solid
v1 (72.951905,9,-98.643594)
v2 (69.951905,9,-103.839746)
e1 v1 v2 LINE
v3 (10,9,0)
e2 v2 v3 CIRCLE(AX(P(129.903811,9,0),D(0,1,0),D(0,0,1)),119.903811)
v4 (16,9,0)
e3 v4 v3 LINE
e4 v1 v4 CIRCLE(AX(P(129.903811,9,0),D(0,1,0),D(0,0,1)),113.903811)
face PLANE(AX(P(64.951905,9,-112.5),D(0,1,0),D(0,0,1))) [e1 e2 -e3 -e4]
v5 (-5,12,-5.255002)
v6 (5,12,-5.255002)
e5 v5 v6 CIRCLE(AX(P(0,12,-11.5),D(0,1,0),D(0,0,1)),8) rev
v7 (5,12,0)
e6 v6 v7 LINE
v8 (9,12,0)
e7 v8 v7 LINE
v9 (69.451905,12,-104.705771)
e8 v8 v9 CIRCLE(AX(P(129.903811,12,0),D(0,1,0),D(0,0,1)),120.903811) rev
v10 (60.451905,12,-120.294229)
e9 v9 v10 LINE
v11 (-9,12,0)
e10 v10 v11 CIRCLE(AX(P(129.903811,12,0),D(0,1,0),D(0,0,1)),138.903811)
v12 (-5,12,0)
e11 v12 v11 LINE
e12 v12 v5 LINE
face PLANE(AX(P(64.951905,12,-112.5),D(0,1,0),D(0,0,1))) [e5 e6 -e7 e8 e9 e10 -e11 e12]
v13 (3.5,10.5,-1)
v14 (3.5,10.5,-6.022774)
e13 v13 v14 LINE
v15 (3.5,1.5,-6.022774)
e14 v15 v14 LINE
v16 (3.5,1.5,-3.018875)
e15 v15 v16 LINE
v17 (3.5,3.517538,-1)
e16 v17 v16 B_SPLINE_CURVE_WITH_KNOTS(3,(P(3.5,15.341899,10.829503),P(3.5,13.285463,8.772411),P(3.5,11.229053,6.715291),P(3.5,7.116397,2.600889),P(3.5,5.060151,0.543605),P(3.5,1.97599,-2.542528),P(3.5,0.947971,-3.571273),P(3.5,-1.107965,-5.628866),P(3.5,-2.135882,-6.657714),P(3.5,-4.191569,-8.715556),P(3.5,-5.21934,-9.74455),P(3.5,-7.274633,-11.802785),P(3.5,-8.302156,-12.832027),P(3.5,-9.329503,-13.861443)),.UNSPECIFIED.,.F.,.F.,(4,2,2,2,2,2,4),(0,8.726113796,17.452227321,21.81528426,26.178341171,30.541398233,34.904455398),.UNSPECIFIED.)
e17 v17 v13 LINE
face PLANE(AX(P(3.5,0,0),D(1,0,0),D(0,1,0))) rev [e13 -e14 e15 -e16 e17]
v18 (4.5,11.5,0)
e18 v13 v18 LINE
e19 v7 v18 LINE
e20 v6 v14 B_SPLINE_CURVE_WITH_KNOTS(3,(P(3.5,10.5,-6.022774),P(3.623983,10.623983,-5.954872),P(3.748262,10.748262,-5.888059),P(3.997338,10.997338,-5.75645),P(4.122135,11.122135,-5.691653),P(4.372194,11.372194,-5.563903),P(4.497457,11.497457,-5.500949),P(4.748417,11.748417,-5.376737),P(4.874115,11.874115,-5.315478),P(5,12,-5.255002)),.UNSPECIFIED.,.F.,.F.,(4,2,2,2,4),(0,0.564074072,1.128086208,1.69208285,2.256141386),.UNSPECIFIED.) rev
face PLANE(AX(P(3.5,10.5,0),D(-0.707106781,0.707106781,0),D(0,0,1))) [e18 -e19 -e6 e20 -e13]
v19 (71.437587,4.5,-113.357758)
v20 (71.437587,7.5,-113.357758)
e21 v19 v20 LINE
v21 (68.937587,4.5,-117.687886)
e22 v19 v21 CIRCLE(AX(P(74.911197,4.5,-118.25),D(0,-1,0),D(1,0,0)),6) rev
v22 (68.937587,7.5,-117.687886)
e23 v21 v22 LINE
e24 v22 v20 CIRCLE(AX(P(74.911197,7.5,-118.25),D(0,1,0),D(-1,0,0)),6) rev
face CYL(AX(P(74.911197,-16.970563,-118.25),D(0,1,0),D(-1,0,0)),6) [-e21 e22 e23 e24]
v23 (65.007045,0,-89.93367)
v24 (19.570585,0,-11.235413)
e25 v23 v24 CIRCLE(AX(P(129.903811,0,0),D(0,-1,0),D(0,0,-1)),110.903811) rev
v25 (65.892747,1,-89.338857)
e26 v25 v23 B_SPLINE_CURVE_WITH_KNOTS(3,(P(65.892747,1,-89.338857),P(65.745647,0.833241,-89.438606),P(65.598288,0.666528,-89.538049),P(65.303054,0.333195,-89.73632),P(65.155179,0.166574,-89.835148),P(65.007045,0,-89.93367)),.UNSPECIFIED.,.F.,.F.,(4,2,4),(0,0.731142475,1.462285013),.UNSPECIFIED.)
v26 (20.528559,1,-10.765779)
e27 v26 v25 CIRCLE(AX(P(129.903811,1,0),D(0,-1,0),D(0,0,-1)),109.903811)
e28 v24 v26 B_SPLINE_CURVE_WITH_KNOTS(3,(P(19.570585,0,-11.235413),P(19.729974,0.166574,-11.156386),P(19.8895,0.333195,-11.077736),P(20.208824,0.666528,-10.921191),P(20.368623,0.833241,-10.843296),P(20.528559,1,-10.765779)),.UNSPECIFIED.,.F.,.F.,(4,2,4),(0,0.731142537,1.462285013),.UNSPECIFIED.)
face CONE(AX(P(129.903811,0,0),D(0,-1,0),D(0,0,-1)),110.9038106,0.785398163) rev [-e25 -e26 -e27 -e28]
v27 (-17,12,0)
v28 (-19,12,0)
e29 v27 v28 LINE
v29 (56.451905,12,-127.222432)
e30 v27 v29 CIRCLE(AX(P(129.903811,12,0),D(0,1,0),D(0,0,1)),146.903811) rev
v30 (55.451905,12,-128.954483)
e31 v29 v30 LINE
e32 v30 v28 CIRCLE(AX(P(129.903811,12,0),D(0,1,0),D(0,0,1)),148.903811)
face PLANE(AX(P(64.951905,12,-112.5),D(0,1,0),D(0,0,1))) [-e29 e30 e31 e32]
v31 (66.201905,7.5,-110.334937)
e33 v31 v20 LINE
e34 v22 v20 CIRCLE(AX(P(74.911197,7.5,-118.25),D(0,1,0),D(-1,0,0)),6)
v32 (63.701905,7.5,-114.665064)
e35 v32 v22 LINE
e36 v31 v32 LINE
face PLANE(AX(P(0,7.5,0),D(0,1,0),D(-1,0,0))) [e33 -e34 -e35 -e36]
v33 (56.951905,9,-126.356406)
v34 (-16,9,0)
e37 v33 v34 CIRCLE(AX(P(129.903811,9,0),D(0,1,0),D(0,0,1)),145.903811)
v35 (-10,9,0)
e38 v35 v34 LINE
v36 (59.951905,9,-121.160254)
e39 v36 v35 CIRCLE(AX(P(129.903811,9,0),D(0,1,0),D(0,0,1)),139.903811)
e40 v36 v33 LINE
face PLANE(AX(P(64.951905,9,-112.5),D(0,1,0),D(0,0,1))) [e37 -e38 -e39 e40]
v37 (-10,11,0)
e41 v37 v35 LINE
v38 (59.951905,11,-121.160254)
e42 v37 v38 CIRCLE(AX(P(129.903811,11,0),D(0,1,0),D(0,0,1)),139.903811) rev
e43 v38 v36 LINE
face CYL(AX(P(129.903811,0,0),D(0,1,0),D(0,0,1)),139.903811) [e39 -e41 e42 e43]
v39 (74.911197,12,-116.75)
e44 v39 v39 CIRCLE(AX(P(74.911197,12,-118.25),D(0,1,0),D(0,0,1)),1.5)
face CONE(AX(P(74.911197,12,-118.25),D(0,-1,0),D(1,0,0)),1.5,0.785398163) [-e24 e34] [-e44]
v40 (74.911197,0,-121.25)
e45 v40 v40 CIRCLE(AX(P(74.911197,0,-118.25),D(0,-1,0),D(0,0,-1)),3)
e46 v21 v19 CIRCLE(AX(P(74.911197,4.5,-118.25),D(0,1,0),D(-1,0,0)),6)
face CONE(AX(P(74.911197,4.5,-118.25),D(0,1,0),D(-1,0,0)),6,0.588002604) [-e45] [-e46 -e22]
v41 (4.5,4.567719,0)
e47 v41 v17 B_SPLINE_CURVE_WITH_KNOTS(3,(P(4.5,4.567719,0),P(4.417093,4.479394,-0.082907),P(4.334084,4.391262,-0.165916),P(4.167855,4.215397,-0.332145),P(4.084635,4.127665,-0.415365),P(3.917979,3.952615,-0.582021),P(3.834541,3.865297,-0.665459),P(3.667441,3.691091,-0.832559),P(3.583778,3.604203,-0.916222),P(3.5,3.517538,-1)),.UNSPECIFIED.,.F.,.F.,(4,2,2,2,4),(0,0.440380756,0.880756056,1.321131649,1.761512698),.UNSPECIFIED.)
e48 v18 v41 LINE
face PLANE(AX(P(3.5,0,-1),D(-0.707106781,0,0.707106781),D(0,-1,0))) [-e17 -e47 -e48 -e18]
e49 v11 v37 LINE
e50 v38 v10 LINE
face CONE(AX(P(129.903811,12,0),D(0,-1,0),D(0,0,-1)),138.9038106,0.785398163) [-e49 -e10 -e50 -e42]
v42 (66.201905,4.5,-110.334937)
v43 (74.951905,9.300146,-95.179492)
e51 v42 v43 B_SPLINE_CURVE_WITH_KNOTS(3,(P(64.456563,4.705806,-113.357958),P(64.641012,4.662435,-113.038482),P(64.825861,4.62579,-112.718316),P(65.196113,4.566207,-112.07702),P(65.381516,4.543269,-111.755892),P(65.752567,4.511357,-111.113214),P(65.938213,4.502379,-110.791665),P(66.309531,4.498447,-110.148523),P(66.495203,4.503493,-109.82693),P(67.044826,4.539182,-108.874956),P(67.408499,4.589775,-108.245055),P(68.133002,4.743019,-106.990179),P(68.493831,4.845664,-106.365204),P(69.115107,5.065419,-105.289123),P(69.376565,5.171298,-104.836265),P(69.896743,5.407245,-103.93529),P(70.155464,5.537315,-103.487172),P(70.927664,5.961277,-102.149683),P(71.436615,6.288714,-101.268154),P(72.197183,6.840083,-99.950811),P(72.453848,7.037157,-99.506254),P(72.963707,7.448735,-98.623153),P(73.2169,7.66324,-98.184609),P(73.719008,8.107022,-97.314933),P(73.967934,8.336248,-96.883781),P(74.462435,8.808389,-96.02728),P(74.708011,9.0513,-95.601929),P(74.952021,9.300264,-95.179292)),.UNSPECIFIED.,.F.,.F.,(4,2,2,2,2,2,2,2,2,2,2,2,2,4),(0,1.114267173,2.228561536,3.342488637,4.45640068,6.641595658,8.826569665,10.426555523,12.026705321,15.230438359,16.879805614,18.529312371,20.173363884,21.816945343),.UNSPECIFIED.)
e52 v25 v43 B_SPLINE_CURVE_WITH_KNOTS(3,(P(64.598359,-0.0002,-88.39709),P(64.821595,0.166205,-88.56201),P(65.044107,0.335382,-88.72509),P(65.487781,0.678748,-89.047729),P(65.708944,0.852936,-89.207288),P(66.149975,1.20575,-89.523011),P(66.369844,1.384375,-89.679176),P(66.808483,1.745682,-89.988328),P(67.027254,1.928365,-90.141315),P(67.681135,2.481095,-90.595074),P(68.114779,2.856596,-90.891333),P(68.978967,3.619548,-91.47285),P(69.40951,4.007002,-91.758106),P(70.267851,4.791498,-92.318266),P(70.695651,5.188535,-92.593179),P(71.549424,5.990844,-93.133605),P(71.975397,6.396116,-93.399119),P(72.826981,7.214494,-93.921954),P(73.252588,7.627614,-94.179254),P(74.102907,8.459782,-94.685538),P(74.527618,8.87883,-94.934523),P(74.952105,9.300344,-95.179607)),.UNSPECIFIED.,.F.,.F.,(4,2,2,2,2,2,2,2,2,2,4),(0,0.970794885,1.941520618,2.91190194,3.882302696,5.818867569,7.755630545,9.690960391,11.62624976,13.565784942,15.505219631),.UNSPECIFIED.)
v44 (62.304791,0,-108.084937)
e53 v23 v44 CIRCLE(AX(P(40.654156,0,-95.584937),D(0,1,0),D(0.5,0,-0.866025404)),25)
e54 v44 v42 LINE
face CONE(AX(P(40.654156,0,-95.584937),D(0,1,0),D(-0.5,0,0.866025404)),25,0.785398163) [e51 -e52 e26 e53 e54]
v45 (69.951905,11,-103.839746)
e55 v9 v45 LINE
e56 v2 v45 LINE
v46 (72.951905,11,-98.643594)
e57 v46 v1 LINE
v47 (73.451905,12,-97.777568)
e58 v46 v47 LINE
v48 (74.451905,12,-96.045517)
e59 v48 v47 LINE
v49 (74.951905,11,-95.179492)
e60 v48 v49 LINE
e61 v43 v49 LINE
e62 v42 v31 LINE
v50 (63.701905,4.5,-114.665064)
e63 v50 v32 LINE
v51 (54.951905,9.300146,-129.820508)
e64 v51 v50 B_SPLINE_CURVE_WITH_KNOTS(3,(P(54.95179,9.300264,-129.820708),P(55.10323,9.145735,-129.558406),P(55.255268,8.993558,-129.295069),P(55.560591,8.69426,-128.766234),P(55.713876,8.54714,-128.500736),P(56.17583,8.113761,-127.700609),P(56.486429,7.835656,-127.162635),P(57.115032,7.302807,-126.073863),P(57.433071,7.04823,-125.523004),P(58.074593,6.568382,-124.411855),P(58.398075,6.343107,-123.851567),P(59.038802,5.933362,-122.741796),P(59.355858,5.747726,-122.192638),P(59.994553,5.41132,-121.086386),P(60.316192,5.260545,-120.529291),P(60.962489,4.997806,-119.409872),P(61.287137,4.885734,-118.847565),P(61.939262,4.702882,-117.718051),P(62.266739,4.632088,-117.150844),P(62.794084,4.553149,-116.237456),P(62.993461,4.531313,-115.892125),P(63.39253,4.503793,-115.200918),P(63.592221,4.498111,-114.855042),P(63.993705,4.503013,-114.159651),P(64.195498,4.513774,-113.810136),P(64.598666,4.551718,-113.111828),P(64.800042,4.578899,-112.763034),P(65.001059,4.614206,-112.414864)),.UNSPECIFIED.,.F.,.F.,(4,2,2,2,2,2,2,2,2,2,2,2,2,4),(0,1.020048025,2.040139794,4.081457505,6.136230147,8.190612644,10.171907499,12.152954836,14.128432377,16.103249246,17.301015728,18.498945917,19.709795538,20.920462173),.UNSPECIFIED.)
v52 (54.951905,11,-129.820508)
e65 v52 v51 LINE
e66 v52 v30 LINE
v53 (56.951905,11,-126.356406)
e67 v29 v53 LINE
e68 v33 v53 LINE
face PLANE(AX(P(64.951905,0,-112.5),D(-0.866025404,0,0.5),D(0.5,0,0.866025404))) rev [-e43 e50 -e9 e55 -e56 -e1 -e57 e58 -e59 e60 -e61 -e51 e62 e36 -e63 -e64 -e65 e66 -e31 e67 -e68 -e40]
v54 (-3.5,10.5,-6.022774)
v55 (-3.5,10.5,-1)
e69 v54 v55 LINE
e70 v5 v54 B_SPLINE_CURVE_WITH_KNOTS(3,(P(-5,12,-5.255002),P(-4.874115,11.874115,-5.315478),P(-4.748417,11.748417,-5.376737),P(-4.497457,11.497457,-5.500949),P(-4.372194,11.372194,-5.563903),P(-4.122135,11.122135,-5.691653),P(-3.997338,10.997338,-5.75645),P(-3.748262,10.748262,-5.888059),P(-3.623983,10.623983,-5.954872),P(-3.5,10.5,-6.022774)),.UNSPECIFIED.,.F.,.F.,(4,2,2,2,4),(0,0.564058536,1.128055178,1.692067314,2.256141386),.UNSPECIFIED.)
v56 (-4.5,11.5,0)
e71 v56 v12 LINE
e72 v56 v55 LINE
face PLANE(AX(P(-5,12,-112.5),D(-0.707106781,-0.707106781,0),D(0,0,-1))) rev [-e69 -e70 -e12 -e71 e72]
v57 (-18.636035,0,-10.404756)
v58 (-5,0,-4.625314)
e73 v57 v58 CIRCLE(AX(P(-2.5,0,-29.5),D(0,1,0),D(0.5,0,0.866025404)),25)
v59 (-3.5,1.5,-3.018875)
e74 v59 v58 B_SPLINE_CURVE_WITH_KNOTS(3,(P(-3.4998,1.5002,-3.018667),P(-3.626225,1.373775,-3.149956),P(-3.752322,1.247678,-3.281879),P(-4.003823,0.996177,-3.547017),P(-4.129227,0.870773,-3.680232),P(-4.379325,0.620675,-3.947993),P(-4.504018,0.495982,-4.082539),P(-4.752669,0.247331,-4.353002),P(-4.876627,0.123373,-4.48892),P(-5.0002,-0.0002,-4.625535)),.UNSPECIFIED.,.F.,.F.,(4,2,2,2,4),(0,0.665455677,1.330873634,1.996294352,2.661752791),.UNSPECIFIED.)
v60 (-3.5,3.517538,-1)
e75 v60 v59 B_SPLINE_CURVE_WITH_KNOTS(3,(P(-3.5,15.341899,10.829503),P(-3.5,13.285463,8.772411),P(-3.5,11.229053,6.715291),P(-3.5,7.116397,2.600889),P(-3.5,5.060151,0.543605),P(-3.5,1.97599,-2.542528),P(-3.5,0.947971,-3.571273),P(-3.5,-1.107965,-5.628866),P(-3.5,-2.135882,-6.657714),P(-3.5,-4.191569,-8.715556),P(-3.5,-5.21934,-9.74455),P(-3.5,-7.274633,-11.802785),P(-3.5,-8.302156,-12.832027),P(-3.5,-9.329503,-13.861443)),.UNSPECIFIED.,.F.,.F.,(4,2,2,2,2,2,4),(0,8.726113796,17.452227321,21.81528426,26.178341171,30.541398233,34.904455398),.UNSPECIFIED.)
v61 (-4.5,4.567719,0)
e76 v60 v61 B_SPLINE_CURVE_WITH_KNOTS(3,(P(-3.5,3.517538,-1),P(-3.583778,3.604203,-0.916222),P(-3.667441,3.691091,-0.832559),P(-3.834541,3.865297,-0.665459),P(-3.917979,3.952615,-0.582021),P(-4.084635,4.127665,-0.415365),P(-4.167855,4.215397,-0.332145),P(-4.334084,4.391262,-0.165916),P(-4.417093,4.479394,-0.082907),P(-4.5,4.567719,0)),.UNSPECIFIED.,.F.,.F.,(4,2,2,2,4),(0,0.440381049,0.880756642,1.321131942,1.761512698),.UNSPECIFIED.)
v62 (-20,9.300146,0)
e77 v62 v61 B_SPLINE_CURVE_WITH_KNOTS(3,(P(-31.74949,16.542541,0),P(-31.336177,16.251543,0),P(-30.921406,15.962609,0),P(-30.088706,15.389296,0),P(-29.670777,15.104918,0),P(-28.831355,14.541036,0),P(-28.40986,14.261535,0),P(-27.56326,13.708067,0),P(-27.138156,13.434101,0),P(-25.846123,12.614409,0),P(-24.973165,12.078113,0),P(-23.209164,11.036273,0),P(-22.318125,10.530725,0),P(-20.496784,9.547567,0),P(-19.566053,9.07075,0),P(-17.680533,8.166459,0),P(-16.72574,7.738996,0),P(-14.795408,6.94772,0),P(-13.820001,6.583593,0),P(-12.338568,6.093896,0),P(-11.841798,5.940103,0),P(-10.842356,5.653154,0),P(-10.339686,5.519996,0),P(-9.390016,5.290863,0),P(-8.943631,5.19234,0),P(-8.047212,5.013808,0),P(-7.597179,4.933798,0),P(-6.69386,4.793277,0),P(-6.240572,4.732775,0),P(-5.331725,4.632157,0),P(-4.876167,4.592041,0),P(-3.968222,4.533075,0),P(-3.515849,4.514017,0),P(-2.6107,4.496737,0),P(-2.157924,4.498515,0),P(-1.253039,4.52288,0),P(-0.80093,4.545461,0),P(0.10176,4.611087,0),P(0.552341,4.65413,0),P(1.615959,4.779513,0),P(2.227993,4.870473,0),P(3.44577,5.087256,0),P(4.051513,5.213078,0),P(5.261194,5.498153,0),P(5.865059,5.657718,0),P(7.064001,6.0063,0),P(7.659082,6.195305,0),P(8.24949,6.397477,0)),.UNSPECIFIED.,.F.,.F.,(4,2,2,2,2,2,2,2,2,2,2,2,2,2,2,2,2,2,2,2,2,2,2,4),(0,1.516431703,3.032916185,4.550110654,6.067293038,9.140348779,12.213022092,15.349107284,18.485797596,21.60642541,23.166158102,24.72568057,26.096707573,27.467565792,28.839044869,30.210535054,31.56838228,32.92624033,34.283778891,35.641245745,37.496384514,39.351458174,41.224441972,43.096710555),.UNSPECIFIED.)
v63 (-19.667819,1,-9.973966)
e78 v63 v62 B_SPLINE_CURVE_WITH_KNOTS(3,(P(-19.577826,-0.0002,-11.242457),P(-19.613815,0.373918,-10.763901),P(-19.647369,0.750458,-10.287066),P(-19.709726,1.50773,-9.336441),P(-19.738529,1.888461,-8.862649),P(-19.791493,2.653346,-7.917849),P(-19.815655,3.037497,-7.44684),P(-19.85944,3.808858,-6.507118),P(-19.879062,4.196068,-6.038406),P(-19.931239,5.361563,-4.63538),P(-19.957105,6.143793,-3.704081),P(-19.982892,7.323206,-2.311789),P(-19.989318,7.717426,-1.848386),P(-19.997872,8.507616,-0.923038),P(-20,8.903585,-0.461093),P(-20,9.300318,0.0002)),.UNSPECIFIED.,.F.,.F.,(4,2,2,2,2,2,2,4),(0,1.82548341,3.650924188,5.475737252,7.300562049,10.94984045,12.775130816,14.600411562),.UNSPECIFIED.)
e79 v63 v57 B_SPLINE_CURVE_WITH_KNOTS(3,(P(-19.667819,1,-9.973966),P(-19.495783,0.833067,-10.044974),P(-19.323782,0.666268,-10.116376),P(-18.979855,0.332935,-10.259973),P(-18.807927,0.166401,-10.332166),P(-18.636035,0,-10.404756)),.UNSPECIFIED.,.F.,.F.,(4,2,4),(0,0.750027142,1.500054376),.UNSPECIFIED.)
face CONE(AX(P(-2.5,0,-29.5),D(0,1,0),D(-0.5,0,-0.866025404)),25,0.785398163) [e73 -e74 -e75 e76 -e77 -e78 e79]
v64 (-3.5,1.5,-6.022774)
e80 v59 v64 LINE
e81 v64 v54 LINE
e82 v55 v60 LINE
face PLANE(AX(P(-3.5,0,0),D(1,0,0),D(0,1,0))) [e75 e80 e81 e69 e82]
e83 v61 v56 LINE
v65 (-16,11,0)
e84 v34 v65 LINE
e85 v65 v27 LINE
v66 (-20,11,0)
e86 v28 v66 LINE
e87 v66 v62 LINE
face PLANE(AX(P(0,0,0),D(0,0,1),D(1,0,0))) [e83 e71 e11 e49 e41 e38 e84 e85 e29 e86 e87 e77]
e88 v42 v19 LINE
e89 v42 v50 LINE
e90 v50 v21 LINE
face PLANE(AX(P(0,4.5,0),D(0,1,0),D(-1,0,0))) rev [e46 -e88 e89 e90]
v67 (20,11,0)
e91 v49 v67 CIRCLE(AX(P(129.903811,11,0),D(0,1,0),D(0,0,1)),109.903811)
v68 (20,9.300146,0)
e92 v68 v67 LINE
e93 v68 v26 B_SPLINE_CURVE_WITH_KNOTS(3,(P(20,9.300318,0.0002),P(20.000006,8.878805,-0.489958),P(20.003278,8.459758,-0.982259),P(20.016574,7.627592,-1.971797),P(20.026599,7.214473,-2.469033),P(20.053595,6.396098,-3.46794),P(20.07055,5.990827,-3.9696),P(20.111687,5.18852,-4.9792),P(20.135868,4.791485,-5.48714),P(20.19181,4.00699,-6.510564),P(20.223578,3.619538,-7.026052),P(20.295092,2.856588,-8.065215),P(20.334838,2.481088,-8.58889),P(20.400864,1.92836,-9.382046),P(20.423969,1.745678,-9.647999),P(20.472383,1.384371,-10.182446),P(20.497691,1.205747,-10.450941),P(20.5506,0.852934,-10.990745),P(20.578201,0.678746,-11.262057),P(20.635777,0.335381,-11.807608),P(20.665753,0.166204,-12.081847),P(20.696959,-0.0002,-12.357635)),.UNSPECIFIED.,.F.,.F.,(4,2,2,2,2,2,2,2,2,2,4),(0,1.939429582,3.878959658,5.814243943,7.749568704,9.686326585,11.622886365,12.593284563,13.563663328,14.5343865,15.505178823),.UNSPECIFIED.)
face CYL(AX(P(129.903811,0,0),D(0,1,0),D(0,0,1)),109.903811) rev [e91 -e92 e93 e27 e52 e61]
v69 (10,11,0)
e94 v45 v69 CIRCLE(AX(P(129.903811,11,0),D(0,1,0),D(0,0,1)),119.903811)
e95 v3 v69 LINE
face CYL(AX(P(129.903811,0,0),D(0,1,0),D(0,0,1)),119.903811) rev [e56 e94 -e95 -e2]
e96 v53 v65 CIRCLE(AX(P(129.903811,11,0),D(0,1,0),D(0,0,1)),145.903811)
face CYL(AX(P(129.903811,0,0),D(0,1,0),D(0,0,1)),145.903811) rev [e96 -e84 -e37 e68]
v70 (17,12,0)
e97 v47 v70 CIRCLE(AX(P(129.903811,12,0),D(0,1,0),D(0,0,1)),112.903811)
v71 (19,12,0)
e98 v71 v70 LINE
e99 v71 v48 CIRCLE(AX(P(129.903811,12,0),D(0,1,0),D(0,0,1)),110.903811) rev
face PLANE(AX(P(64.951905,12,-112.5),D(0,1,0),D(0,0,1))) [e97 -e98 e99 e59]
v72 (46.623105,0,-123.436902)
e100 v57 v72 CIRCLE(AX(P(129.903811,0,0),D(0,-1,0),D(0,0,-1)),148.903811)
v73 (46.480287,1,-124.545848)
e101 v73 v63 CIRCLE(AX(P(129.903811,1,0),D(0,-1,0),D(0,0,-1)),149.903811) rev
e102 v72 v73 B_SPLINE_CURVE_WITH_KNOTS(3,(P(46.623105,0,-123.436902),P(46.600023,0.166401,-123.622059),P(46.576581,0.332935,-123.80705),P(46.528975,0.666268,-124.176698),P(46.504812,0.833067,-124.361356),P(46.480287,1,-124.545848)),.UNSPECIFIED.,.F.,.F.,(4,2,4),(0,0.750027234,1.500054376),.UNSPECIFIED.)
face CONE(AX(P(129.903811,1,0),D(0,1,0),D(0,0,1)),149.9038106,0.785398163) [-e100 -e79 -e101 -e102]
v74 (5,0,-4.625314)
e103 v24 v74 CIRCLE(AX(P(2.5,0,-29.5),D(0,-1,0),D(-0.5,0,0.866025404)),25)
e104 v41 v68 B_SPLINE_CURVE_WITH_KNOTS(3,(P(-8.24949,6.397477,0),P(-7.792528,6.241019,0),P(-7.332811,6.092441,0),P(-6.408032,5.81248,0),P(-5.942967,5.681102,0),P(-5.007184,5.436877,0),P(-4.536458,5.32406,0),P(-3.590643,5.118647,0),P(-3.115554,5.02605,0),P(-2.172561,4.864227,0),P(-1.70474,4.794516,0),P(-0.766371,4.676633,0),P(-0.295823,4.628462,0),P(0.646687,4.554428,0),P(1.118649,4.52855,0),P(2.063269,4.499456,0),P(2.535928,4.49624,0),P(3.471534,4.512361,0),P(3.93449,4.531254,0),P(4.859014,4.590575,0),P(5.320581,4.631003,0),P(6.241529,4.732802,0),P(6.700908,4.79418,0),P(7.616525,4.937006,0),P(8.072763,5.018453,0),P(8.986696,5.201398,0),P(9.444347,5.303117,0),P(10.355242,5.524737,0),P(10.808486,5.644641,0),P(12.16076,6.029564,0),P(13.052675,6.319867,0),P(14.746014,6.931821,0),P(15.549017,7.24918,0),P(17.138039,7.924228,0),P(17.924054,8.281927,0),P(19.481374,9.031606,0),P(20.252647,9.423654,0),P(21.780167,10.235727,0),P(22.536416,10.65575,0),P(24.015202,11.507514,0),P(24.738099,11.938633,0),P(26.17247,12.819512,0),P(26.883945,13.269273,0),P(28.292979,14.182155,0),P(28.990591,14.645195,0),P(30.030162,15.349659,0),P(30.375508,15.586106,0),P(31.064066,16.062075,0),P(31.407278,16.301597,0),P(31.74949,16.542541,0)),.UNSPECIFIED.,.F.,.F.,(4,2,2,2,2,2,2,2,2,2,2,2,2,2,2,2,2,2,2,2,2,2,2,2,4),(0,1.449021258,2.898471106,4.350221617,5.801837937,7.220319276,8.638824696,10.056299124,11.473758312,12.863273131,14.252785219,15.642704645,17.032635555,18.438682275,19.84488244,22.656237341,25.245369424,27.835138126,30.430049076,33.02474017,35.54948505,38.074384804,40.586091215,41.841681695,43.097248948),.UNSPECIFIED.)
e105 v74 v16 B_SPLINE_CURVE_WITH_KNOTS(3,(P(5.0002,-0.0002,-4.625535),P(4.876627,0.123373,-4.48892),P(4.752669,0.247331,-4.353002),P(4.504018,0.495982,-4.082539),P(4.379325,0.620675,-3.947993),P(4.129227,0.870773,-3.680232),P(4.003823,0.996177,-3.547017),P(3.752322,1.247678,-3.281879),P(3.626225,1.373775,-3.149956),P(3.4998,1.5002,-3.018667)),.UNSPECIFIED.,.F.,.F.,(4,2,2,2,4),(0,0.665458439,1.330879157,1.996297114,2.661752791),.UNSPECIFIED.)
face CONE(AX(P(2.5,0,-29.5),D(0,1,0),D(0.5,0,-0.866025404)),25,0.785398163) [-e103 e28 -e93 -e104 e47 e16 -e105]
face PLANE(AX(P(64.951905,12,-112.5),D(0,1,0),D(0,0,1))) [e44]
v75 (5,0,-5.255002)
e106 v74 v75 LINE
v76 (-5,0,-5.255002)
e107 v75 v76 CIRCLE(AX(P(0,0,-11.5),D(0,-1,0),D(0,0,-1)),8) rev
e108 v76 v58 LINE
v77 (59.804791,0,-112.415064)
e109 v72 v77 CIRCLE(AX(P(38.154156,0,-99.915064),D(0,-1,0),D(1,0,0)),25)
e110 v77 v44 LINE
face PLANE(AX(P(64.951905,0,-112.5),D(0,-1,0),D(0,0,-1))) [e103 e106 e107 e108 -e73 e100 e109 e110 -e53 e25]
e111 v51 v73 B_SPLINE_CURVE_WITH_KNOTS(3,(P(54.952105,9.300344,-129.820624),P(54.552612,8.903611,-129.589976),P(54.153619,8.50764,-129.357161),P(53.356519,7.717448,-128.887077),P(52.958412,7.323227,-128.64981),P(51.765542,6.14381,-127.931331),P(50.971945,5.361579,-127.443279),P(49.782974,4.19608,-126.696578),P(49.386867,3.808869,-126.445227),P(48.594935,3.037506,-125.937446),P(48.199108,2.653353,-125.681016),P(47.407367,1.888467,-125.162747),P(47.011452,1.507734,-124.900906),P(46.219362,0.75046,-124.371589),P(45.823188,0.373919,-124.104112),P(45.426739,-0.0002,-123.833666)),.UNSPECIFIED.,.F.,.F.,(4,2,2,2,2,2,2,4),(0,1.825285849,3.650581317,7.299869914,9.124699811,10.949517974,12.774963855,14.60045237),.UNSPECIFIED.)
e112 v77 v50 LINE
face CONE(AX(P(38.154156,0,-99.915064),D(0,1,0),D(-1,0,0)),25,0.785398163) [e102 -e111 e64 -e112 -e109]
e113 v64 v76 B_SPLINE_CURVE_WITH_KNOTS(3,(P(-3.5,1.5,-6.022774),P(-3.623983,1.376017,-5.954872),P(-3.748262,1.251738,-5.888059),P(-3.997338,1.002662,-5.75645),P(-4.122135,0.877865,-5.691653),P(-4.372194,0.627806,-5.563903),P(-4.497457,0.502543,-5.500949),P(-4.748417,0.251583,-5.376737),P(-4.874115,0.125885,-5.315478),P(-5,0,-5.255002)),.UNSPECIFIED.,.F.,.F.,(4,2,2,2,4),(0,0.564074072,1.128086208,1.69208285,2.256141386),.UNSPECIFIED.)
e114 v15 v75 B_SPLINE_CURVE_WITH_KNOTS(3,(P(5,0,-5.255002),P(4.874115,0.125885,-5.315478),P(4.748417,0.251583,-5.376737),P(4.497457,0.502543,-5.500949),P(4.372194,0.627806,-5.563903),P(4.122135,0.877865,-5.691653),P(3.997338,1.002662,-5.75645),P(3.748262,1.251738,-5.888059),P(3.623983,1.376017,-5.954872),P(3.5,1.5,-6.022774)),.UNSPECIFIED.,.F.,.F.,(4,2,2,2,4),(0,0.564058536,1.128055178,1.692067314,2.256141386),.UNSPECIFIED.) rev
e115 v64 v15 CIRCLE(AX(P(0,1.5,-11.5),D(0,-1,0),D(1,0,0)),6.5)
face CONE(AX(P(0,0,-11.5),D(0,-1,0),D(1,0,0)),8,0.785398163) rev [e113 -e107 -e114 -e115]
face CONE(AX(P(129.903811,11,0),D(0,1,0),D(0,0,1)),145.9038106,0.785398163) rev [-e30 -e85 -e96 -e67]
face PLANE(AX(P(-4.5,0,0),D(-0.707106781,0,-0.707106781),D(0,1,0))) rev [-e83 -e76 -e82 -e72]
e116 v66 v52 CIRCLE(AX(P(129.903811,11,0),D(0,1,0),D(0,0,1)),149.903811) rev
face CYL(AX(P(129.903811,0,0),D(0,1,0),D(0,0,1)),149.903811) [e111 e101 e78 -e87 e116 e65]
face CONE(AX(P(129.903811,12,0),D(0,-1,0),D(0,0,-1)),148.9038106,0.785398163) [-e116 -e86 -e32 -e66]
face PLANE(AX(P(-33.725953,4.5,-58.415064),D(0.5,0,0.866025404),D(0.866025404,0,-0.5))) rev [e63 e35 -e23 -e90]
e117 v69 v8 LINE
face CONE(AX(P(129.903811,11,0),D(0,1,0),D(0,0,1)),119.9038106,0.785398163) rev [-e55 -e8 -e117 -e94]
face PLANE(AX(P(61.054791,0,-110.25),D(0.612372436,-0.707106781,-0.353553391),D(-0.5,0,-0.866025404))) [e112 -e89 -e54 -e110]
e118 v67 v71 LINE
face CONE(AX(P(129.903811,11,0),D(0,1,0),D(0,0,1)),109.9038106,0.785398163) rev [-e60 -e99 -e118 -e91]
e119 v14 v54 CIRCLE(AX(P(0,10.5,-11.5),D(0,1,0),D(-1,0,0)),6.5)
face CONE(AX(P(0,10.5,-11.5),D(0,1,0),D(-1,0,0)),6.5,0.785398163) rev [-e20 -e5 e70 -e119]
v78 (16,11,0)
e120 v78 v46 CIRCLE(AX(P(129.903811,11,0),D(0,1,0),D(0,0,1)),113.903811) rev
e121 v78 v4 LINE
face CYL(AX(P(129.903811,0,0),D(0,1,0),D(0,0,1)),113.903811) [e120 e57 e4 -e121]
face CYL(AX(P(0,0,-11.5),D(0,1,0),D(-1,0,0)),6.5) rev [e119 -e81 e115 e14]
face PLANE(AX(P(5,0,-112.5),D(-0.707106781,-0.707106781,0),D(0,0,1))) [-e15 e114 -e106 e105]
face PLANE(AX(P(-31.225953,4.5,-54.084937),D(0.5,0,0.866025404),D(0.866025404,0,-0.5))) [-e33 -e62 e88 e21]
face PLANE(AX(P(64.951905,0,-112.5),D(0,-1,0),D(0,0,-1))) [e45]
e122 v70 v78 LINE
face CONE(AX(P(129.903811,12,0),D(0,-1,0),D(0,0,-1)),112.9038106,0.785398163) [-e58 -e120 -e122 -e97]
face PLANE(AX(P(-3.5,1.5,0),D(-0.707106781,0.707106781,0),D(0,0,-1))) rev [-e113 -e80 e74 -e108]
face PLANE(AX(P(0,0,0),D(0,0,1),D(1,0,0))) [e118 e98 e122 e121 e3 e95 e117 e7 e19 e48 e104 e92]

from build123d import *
from build123d.topology import SkipClean

# Parameters (mm, degrees)
REVOLVE1_ANGLE       = 60
CUT_EXTRUDE1_DEPTH   = 151.38335158
BOSS_EXTRUDE1_DEPTH  = 12
BOSS_EXTRUDE2_DEPTH  = 7.5
CUT_EXTRUDE2_DEPTH   = 4.5
CHAMFER2_SIZE        = 4.5
CHAMFER5_SIZE2       = 3
CHAMFER5_SIZE        = 4.5
CHAMFER3_SIZE        = 1.5
CUT_REVOLVE1_ANGLE   = 90
CHAMFER4_SIZE        = 4.5
MIRROR4_COPY_1_ANGLE = 90
CHAMFER1_SIZE        = 1


with BuildPart() as part:
    # Sketch2 → Revolve1 (revolve)
    with BuildSketch(Plane.XY):
        Polygon((-16, 12), (-20, 12), (-20, 0), (20, 0), (20, 12), (16, 12), (16, 9), (10, 9), (10, 12), (-10, 12), (-10, 9), (-16, 9), align=None)
    revolve(axis=Axis((129.9038106, 0, 0), (0, -1, 0)), revolution_arc=REVOLVE1_ANGLE)

    # Sketch3 → Cut-Extrude1 (cut, through all)
    with BuildSketch(Plane(origin=(0, 12, 0), x_dir=(1, 0, 0), z_dir=(0, 1, 0))):
        with BuildLine():
            ThreePointArc((6.5, 11.5), (-3.122498999, 17.200877125), (-3.5, 6.022774425))
            Line((-3.5, 6.022774425), (-3.5, 11.5))
            Line((-3.5, 11.5), (3.5, 11.5))
            Line((3.5, 11.5), (3.5, 6.022774425))
            ThreePointArc((3.5, 6.022774425), (5.700877125, 8.377501001), (6.5, 11.5))
        make_face()
        with BuildLine():
            Line((-3.5, 11.5), (-3.5, 6.022774425))
            ThreePointArc((-3.5, 6.022774425), (0, 5), (3.5, 6.022774425))
            Line((3.5, 6.022774425), (3.5, 11.5))
            Line((3.5, 11.5), (-3.5, 11.5))
        make_face()
        with BuildLine():
            Line((-3.5, 6.022774425), (-3.5, 0))
            Line((-3.5, 0), (3.5, 0))
            Line((3.5, 0), (3.5, 6.022774425))
            ThreePointArc((3.5, 6.022774425), (0, 5), (-3.5, 6.022774425))
        make_face()
    extrude(amount=-CUT_EXTRUDE1_DEPTH, mode=Mode.SUBTRACT)



with BuildPart() as body_2:
    # Sketch4 → Boss-Extrude1 (new body)
    with BuildSketch(Plane(origin=(0, 12, 0), x_dir=(1, 0, 0), z_dir=(0, 1, 0))):
        with BuildLine():
            ThreePointArc((68.937586537, 117.687885509), (69.715045021, 115.250000028), (71.437586537, 113.35775849))
            Line((71.437586537, 113.35775849), (76.161197444, 116.084936519))
            Line((76.161197444, 116.084936519), (73.661197444, 120.415063537))
            Line((73.661197444, 120.415063537), (68.937586537, 117.687885509))
        make_face()
        with BuildLine():
            Line((76.161197444, 116.084936519), (71.437586537, 113.35775849))
            ThreePointArc((71.437586537, 113.35775849), (77.66422619, 112.918880753), (80.911197444, 118.250000028))
            ThreePointArc((80.911197444, 118.250000028), (74.629830638, 124.243399124), (68.937586537, 117.687885509))
            Line((68.937586537, 117.687885509), (73.661197444, 120.415063537))
            Line((73.661197444, 120.415063537), (76.161197444, 116.084936519))
        make_face()
    extrude(amount=-BOSS_EXTRUDE1_DEPTH)


with BuildPart() as part_1:
    add(part.part)

    add(body_2.part)  # Boss-Extrude2 merges body 2
    # Sketch4<3> → Boss-Extrude2 (add)
    with BuildSketch(Plane(origin=(0, 12, 0), x_dir=(1, 0, 0), z_dir=(0, 1, 0))):
        with BuildLine():
            Line((63.7019053, 114.665063537), (66.2019053, 110.334936519))
            Line((66.2019053, 110.334936519), (71.437586537, 113.35775849))
            ThreePointArc((71.437586537, 113.35775849), (69.715045021, 115.250000028), (68.937586537, 117.687885509))
            Line((68.937586537, 117.687885509), (63.7019053, 114.665063537))
        make_face()
    extrude(amount=-BOSS_EXTRUDE2_DEPTH)

    # Sketch4<5> → Cut-Extrude2 (cut)
    with SkipClean():  # the faces are left unmerged after this step: merging them gives an invalid solid
        with BuildSketch(Plane(origin=(0, 12, 0), x_dir=(1, 0, 0), z_dir=(0, 1, 0))):
            with BuildLine():
                Line((63.7019053, 114.665063537), (66.2019053, 110.334936519))
                Line((66.2019053, 110.334936519), (71.437586537, 113.35775849))
                ThreePointArc((71.437586537, 113.35775849), (69.715045021, 115.250000028), (68.937586537, 117.687885509))
                Line((68.937586537, 117.687885509), (63.7019053, 114.665063537))
            make_face()
        extrude(amount=-CUT_EXTRUDE2_DEPTH, mode=Mode.SUBTRACT)

    # Chamfer2
    chamfer2_edges = [part_1.edges().sort_by_distance(p)[0] for p in [
        (80.107349866, 12, -121.250000028),
    ]]
    chamfer(chamfer2_edges, length=CHAMFER2_SIZE - 0.0001)  # a hair under: the kernel refuses the full size

    # Chamfer5
    chamfer5_edges = [part_1.edges().sort_by_distance(p)[0] for p in [
        (80.88480835, 0, -118.812114547),
    ]]
    chamfer5_side = [part_1.faces().sort_by_distance(p)[0] for p in [
        (80.88480835, 0.06, -118.812114547),
    ]]
    chamfer(chamfer5_edges, length=CHAMFER5_SIZE - 0.0001, length2=CHAMFER5_SIZE2 - 0.0001, reference=chamfer5_side[0])  # a hair under: the kernel refuses the full size

    # Chamfer3
    chamfer3_edges = [part_1.edges().sort_by_distance(p)[0] for p in [
        (0, 0, -18),
        (3.5, 0, -3.011387212),
        (-3.5, 12, -3.011387212),
        (-3.5, 0, -3.011387212),
        (0, 12, -18),
        (3.5, 12, -3.011387212),
    ]]
    chamfer(chamfer3_edges, length=CHAMFER3_SIZE)

    # Sketch17 → Cut-Revolve1 (revolve, cut)
    with BuildSketch(Plane(origin=(-33.72595265, 0, -58.415063523), x_dir=(-0.8660254037844378, 0, 0.5000000000000017), z_dir=(-0.5000000000000016, -1.1564823173178769e-15, -0.8660254037844377))):
        Polygon((-118.545643971, 10.545643943), (-118.545643971, 0), (-108.000000028, 0), align=None)
    cut_revolve1 = revolve(axis=Axis((38.154155888, -1.265151723, -99.915063537), (0, 1, 0)), revolution_arc=CUT_REVOLVE1_ANGLE, mode=Mode.SUBTRACT)

    # Mirror1: Cut-Revolve1 across plane
    add(cut_revolve1.mirror(Plane(origin=(-32.47595265, 0, -56.250000014), x_dir=(-0.866025403784439, -2.003086131649547e-15, 0.49999999999999933), z_dir=(-0.4999999999999994, -1.1564823173178701e-15, -0.866025403784439))), mode=Mode.SUBTRACT)

    # Chamfer4
    chamfer4_edges = [part_1.edges().sort_by_distance(p)[0] for p in [
        (64.9519053, 0, -112.500000028),
    ]]
    chamfer(chamfer4_edges, length=CHAMFER4_SIZE - 0.0001)  # a hair under: the kernel refuses the full size

    # Mirror4: Cut-Revolve1 across plane
    add(cut_revolve1.mirror(Plane(origin=(32.47595265, 0, -56.250000014), x_dir=(0.8660254037844382, 0, 0.5000000000000009), z_dir=(0.5000000000000009, 0, -0.8660254037844382))), mode=Mode.SUBTRACT)

    # Mirror4 copy 1 sketch → Mirror4 copy 1 (revolve, cut)
    with BuildSketch(Plane(origin=(2.5, 0, -112.500000028), x_dir=(0, 0, -1), z_dir=(1, 0, 0))):
        Polygon((-118.545643971, 10.545643943), (-118.545643971, 0), (-108.000000028, 0), align=None)
    revolve(axis=Axis((2.5, -1.265151723, -29.5), (0, 1, 0)), revolution_arc=MIRROR4_COPY_1_ANGLE, mode=Mode.SUBTRACT)

    # Chamfer1
    chamfer1_edges = [part_1.edges().sort_by_distance(p)[0] for p in [
        (0.083302496, 0, -74.9519053),
        (34.724318648, 0, -54.9519053),
        (-3.5, 7.508472143, 0),
        (3.5, 7.508472143, 0),
        (3.547404111, 12, -72.9519053),
        (8.743556534, 12, -69.9519053),
        (26.06406461, 12, -59.9519053),
        (31.260217033, 12, -56.9519053),
        (34.724318648, 12, -54.9519053),
        (0.083302496, 12, -74.9519053),
    ]]
    chamfer(chamfer1_edges, length=CHAMFER1_SIZE)


solid = part_1.part
